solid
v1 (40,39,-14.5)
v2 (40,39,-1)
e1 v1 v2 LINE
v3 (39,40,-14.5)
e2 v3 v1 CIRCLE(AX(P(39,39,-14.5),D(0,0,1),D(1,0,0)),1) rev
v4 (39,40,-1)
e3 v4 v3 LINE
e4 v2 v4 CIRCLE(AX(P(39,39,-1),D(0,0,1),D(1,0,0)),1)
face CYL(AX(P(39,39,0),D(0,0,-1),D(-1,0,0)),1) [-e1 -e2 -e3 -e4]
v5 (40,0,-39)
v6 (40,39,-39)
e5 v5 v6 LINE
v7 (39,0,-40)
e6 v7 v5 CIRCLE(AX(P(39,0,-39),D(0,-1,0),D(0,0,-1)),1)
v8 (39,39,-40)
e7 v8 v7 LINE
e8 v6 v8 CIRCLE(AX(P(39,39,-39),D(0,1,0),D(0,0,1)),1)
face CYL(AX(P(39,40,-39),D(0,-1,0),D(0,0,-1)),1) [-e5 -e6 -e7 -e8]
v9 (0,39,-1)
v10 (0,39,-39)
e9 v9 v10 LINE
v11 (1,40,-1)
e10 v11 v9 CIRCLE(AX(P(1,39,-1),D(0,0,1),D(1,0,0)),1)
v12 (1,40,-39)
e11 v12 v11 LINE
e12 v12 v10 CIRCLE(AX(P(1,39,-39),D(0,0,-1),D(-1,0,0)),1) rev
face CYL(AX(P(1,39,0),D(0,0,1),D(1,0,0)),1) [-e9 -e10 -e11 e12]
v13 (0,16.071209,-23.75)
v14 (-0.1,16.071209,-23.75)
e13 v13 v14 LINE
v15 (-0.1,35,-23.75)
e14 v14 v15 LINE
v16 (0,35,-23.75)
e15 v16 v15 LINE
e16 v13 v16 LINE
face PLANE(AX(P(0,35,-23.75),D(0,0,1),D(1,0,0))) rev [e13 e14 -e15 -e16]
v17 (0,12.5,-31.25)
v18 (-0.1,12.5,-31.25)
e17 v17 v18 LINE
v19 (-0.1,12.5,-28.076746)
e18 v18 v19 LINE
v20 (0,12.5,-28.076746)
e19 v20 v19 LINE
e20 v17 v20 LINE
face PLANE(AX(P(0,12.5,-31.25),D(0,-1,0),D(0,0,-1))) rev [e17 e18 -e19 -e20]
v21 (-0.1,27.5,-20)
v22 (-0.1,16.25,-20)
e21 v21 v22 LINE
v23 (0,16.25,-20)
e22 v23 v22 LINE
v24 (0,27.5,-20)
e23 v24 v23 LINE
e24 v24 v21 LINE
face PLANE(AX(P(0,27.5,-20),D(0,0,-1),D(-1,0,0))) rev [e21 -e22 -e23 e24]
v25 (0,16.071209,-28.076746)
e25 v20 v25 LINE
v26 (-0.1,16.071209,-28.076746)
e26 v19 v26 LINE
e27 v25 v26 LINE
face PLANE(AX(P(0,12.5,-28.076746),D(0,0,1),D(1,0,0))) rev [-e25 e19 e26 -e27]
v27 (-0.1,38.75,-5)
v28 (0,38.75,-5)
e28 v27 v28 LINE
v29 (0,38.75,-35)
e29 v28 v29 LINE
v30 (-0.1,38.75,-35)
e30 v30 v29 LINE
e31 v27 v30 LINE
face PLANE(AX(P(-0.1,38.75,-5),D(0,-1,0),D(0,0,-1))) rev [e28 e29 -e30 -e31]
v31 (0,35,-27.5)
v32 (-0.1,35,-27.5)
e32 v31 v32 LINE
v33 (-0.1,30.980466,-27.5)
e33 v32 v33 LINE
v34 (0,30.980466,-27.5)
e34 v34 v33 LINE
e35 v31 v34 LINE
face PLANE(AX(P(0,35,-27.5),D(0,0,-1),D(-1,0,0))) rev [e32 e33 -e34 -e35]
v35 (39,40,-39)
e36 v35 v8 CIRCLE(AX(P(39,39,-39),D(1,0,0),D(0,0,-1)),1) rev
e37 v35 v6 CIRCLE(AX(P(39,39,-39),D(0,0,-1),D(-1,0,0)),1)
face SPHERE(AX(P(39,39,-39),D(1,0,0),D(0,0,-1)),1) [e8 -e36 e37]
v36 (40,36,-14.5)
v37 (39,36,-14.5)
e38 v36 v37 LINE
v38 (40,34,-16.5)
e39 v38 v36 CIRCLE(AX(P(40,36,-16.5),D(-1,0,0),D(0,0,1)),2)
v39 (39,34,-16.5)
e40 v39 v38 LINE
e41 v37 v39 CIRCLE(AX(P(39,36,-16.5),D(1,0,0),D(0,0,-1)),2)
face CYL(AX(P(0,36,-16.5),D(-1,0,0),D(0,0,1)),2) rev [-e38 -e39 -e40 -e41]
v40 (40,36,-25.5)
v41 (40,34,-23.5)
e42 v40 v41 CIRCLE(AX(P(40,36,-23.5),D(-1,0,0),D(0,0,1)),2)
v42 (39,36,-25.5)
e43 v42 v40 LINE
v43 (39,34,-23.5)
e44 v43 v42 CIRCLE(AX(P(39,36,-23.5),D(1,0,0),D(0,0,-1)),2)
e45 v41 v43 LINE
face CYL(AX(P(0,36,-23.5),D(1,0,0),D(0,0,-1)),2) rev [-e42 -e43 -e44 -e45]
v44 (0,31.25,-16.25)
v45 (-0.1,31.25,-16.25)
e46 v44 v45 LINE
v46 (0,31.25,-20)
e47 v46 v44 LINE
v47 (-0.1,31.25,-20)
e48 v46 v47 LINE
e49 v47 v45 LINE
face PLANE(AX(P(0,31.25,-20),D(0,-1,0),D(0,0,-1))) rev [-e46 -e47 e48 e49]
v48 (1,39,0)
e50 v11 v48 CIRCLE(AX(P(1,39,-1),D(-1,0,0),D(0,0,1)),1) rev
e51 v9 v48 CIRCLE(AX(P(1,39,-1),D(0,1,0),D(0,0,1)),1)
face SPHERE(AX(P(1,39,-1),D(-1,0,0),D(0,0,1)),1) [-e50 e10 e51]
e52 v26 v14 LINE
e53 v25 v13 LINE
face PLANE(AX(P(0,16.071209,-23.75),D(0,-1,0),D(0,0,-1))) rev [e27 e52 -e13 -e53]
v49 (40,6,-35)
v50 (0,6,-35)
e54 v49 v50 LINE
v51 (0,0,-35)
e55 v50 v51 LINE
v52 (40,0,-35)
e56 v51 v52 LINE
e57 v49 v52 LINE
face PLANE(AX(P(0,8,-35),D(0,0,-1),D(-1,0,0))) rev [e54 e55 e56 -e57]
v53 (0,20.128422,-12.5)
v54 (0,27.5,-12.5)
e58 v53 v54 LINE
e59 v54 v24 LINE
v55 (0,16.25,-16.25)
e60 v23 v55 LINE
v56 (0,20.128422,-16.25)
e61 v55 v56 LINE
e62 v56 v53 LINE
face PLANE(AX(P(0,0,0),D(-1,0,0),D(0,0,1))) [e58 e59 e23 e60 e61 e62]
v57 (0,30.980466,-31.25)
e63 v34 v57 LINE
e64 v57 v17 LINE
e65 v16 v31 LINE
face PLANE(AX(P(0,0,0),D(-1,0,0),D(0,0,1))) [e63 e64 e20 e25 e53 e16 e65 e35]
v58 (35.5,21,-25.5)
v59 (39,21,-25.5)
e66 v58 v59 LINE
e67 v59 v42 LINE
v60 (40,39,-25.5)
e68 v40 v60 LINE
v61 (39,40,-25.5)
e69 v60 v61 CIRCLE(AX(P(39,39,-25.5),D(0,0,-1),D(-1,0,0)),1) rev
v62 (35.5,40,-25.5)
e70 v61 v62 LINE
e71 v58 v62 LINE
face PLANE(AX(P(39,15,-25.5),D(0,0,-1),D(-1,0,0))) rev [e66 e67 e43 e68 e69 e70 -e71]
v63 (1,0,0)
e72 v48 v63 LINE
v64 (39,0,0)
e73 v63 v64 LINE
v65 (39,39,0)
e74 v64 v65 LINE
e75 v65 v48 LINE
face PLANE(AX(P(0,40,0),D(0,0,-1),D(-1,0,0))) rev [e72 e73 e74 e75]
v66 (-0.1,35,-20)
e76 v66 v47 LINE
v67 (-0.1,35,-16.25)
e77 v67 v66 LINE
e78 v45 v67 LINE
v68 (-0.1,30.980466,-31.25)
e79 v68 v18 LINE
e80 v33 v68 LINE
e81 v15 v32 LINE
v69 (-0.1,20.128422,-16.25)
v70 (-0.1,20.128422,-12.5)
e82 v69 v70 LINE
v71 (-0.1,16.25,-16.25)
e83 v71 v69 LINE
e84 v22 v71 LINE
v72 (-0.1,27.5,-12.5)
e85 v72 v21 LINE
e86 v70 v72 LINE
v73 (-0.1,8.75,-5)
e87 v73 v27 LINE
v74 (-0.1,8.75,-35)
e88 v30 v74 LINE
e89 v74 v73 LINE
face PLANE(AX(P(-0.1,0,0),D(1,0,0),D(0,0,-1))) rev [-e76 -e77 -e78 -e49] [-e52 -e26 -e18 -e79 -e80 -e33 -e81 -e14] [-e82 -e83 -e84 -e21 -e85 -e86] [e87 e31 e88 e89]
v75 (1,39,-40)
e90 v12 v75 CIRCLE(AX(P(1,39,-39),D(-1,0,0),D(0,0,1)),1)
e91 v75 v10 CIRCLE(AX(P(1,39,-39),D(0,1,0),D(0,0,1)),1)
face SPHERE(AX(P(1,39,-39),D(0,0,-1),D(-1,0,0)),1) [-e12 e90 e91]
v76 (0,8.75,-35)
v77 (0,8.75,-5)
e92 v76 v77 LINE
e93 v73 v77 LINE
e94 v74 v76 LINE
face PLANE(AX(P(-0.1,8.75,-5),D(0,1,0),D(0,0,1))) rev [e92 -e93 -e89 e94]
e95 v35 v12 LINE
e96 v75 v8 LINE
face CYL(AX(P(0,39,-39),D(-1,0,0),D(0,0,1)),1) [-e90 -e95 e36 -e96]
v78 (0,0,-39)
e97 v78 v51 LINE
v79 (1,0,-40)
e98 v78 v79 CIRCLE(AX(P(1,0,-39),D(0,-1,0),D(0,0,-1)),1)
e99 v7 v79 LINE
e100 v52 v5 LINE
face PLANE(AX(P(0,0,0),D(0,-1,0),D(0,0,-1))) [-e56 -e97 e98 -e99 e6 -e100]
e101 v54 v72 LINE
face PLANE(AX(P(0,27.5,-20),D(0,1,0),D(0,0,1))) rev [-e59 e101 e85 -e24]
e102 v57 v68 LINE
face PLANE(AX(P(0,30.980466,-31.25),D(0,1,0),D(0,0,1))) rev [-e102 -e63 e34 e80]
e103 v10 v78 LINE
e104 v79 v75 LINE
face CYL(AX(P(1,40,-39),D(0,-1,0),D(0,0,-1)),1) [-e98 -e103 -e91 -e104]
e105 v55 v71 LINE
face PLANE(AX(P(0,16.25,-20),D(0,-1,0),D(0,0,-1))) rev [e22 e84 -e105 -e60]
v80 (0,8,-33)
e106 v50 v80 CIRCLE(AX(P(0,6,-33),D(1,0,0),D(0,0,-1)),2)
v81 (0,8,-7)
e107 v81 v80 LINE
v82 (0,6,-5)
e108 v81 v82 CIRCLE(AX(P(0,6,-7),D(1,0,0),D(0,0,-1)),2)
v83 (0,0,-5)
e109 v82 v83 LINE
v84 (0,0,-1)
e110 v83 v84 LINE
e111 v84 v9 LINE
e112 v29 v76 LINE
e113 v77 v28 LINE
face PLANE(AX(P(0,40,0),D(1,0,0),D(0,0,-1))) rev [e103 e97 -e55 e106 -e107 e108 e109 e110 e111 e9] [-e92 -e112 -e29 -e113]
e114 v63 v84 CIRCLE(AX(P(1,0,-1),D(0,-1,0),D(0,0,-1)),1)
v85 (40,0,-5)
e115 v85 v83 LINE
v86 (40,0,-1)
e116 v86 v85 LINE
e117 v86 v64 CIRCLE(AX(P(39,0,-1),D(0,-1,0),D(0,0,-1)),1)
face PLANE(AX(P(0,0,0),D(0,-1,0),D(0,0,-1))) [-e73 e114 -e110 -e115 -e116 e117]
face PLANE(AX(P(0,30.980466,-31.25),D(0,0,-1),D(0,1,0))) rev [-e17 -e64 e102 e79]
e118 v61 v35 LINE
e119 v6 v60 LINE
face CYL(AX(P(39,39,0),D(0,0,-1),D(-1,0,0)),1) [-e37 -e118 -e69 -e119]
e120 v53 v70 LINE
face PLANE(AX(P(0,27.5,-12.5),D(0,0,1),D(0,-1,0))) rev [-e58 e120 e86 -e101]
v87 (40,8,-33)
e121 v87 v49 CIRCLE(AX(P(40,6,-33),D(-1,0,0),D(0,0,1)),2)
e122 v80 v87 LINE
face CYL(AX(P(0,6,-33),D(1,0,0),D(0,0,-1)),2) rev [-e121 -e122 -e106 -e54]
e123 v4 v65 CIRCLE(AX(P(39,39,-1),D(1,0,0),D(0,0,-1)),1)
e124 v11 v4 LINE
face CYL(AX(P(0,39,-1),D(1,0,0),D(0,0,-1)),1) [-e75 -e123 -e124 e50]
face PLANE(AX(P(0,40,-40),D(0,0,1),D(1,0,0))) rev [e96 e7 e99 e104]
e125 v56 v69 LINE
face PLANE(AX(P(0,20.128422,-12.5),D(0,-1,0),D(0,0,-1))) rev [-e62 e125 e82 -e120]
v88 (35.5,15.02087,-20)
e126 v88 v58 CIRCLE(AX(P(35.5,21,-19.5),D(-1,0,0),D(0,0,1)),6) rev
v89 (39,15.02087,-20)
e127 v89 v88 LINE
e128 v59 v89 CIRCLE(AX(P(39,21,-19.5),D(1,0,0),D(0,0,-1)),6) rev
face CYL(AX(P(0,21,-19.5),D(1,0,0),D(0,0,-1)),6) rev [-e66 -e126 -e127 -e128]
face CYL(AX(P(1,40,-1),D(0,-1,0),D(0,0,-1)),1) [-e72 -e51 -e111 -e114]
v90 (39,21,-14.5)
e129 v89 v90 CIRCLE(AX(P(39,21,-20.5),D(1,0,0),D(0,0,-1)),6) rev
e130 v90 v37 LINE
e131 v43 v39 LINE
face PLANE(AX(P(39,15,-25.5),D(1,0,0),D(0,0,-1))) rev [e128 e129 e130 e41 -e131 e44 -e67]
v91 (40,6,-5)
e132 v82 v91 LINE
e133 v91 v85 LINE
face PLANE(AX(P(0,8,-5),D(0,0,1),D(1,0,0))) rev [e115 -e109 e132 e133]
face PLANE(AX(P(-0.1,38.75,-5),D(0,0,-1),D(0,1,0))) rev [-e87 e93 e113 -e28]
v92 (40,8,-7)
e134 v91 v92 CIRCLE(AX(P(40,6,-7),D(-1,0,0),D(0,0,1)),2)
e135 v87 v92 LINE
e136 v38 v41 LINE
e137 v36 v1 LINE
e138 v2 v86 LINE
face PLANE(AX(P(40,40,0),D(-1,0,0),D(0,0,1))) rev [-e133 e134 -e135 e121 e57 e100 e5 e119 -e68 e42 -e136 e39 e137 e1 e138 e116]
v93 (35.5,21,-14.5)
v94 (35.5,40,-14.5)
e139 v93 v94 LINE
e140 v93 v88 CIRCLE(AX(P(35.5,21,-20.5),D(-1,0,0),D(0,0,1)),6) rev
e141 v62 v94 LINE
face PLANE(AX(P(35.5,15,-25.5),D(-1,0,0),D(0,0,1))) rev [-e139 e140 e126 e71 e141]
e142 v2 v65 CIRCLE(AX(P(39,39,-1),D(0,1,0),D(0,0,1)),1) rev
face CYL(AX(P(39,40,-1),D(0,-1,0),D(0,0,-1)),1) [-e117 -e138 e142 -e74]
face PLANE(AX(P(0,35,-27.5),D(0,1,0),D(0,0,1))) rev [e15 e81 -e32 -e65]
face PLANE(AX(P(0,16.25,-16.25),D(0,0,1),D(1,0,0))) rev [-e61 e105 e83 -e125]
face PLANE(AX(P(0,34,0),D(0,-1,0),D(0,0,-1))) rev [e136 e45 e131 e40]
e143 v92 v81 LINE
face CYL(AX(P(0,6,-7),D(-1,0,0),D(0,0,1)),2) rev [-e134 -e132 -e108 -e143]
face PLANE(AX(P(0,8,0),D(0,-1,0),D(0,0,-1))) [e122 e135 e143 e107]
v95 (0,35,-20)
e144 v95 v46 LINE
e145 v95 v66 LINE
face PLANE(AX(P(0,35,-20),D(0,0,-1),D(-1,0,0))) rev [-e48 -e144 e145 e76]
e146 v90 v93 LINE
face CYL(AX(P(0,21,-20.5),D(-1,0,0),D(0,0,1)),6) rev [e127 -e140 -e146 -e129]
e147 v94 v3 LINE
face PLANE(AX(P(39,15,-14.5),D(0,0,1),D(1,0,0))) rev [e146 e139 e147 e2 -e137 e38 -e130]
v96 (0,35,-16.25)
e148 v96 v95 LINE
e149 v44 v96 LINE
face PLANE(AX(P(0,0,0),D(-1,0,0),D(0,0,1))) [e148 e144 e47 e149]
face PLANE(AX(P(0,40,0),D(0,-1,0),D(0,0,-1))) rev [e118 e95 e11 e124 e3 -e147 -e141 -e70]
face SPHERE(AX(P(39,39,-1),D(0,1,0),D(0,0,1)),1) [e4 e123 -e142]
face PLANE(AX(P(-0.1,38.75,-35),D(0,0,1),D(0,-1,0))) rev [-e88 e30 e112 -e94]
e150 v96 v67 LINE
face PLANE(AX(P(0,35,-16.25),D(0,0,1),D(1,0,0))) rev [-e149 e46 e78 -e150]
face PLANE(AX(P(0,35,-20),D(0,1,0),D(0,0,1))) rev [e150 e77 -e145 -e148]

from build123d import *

# Parameters (mm, degrees)
SKETCH1_W           = 40
SKETCH1_H           = 40
BOSS_EXTRUDE1_DEPTH = 40
SKETCH2_W           = 40
SKETCH2_H           = 30
FORK_CUTOUT_DEPTH   = 8
SKETCH5_W           = 3.5
SKETCH5_H           = 11
CUT_EXTRUDE3_DEPTH  = 25
FILLET5_R           = 6
SKETCH6_W           = 1
SKETCH6_H           = 11
CUT_EXTRUDE4_DEPTH  = 6
FILLET6_R           = 2
FILLET8_R           = 2
SKETCH7_W           = 30
SKETCH7_H           = 30
BOSS_EXTRUDE2_DEPTH = 0.1
SKETCH10_W          = 3.75
SKETCH10_H          = 3.75
MARK38_DEPTH        = 0.1
FILLET9_R           = 1


with BuildPart() as part:
    # Sketch1 → Boss-Extrude1 (new body)
    with BuildSketch(Plane(origin=(0, 0, 0), x_dir=(1, 0, 0), z_dir=(0, 1, 0))):
        with Locations((20, 20)):
            Rectangle(SKETCH1_W, SKETCH1_H)
    extrude(amount=BOSS_EXTRUDE1_DEPTH)

    # Sketch2 → Fork Cutout (cut)
    with BuildSketch(Plane.XZ):
        with Locations((20, -20)):
            Rectangle(SKETCH2_W, SKETCH2_H)
    extrude(amount=-FORK_CUTOUT_DEPTH, mode=Mode.SUBTRACT)

    # Sketch5 → Cut-Extrude3 (cut)
    with BuildSketch(Plane(origin=(0, 40, 0), x_dir=(1, 0, 0), z_dir=(0, 1, 0))):
        with Locations((37.25, 20)):
            Rectangle(SKETCH5_W, SKETCH5_H)
    extrude(amount=-CUT_EXTRUDE3_DEPTH, mode=Mode.SUBTRACT)

    # Fillet5
    # the kernel refuses this fillet: 6 mm, written as the material it adds along each edge
    with BuildSketch(Plane(origin=(20.5, 15, -14.5), x_dir=(0, 1, 0), z_dir=(1, 0, 0)), Plane(origin=(39, 15, -25.5), x_dir=(0, 1, 0), z_dir=(-1, 0, 0))) as fillet5_piece_1:
        with BuildLine():
            CenterArc((FILLET5_R, -FILLET5_R), FILLET5_R, 90, 90)
            Line((0, -FILLET5_R), (0, 0))
            Line((0, 0), (FILLET5_R, 0))
        make_face()
    extrude(amount=18.5)

    # Sketch6 → Cut-Extrude4 (cut)
    with BuildSketch(Plane(origin=(0, 40, 0), x_dir=(1, 0, 0), z_dir=(0, 1, 0))):
        with Locations((39.5, 20)):
            Rectangle(SKETCH6_W, SKETCH6_H)
    extrude(amount=-CUT_EXTRUDE4_DEPTH, mode=Mode.SUBTRACT)

    # Fillet6
    fillet6_edges = [part.edges().sort_by_distance(p)[0] for p in [
        (39.5, 34, -25.5),
        (39.5, 34, -14.5),
    ]]
    fillet(fillet6_edges, radius=FILLET6_R)

    # Fillet8
    fillet8_edges = [part.edges().sort_by_distance(p)[0] for p in [
        (20, 8, -5),
        (20, 8, -35),
    ]]
    fillet(fillet8_edges, radius=FILLET8_R)

    # Sketch7 → Boss-Extrude2 (add)
    with BuildSketch(Plane.ZY):
        with Locations((-20, 23.75)):
            Rectangle(SKETCH7_W, SKETCH7_H)
    extrude(amount=BOSS_EXTRUDE2_DEPTH)

    # Sketch10 → Mark38 (cut)
    with BuildSketch(Plane.ZY.offset(0.1)):
        with Locations((-18.125, 33.125)):
            Rectangle(SKETCH10_W, SKETCH10_H)
        Polygon((-20, 27.5), (-12.5, 27.5), (-12.5, 20.128421558), (-16.25, 20.128421558), (-16.25, 16.25), (-20, 16.25), align=None)
        Polygon((-27.5, 35), (-23.75, 35), (-23.75, 16.071209331), (-28.076745998, 16.071209331), (-28.076745998, 12.5), (-31.25, 12.5), (-31.25, 30.980466229), (-27.5, 30.980466229), align=None)
    extrude(amount=-MARK38_DEPTH, mode=Mode.SUBTRACT)

    # Fillet9
    fillet9_edges = [part.edges().sort_by_distance(p)[0] for p in [
        (40, 40, -7.25),
        (20, 40, -40),
        (0, 40, -20),
        (40, 40, -32.75),
        (0, 20, -40),
        (40, 20, -40),
        (40, 20, 0),
        (0, 20, 0),
        (20, 40, 0),
    ]]
    fillet(fillet9_edges, radius=FILLET9_R)


solid = part.part
